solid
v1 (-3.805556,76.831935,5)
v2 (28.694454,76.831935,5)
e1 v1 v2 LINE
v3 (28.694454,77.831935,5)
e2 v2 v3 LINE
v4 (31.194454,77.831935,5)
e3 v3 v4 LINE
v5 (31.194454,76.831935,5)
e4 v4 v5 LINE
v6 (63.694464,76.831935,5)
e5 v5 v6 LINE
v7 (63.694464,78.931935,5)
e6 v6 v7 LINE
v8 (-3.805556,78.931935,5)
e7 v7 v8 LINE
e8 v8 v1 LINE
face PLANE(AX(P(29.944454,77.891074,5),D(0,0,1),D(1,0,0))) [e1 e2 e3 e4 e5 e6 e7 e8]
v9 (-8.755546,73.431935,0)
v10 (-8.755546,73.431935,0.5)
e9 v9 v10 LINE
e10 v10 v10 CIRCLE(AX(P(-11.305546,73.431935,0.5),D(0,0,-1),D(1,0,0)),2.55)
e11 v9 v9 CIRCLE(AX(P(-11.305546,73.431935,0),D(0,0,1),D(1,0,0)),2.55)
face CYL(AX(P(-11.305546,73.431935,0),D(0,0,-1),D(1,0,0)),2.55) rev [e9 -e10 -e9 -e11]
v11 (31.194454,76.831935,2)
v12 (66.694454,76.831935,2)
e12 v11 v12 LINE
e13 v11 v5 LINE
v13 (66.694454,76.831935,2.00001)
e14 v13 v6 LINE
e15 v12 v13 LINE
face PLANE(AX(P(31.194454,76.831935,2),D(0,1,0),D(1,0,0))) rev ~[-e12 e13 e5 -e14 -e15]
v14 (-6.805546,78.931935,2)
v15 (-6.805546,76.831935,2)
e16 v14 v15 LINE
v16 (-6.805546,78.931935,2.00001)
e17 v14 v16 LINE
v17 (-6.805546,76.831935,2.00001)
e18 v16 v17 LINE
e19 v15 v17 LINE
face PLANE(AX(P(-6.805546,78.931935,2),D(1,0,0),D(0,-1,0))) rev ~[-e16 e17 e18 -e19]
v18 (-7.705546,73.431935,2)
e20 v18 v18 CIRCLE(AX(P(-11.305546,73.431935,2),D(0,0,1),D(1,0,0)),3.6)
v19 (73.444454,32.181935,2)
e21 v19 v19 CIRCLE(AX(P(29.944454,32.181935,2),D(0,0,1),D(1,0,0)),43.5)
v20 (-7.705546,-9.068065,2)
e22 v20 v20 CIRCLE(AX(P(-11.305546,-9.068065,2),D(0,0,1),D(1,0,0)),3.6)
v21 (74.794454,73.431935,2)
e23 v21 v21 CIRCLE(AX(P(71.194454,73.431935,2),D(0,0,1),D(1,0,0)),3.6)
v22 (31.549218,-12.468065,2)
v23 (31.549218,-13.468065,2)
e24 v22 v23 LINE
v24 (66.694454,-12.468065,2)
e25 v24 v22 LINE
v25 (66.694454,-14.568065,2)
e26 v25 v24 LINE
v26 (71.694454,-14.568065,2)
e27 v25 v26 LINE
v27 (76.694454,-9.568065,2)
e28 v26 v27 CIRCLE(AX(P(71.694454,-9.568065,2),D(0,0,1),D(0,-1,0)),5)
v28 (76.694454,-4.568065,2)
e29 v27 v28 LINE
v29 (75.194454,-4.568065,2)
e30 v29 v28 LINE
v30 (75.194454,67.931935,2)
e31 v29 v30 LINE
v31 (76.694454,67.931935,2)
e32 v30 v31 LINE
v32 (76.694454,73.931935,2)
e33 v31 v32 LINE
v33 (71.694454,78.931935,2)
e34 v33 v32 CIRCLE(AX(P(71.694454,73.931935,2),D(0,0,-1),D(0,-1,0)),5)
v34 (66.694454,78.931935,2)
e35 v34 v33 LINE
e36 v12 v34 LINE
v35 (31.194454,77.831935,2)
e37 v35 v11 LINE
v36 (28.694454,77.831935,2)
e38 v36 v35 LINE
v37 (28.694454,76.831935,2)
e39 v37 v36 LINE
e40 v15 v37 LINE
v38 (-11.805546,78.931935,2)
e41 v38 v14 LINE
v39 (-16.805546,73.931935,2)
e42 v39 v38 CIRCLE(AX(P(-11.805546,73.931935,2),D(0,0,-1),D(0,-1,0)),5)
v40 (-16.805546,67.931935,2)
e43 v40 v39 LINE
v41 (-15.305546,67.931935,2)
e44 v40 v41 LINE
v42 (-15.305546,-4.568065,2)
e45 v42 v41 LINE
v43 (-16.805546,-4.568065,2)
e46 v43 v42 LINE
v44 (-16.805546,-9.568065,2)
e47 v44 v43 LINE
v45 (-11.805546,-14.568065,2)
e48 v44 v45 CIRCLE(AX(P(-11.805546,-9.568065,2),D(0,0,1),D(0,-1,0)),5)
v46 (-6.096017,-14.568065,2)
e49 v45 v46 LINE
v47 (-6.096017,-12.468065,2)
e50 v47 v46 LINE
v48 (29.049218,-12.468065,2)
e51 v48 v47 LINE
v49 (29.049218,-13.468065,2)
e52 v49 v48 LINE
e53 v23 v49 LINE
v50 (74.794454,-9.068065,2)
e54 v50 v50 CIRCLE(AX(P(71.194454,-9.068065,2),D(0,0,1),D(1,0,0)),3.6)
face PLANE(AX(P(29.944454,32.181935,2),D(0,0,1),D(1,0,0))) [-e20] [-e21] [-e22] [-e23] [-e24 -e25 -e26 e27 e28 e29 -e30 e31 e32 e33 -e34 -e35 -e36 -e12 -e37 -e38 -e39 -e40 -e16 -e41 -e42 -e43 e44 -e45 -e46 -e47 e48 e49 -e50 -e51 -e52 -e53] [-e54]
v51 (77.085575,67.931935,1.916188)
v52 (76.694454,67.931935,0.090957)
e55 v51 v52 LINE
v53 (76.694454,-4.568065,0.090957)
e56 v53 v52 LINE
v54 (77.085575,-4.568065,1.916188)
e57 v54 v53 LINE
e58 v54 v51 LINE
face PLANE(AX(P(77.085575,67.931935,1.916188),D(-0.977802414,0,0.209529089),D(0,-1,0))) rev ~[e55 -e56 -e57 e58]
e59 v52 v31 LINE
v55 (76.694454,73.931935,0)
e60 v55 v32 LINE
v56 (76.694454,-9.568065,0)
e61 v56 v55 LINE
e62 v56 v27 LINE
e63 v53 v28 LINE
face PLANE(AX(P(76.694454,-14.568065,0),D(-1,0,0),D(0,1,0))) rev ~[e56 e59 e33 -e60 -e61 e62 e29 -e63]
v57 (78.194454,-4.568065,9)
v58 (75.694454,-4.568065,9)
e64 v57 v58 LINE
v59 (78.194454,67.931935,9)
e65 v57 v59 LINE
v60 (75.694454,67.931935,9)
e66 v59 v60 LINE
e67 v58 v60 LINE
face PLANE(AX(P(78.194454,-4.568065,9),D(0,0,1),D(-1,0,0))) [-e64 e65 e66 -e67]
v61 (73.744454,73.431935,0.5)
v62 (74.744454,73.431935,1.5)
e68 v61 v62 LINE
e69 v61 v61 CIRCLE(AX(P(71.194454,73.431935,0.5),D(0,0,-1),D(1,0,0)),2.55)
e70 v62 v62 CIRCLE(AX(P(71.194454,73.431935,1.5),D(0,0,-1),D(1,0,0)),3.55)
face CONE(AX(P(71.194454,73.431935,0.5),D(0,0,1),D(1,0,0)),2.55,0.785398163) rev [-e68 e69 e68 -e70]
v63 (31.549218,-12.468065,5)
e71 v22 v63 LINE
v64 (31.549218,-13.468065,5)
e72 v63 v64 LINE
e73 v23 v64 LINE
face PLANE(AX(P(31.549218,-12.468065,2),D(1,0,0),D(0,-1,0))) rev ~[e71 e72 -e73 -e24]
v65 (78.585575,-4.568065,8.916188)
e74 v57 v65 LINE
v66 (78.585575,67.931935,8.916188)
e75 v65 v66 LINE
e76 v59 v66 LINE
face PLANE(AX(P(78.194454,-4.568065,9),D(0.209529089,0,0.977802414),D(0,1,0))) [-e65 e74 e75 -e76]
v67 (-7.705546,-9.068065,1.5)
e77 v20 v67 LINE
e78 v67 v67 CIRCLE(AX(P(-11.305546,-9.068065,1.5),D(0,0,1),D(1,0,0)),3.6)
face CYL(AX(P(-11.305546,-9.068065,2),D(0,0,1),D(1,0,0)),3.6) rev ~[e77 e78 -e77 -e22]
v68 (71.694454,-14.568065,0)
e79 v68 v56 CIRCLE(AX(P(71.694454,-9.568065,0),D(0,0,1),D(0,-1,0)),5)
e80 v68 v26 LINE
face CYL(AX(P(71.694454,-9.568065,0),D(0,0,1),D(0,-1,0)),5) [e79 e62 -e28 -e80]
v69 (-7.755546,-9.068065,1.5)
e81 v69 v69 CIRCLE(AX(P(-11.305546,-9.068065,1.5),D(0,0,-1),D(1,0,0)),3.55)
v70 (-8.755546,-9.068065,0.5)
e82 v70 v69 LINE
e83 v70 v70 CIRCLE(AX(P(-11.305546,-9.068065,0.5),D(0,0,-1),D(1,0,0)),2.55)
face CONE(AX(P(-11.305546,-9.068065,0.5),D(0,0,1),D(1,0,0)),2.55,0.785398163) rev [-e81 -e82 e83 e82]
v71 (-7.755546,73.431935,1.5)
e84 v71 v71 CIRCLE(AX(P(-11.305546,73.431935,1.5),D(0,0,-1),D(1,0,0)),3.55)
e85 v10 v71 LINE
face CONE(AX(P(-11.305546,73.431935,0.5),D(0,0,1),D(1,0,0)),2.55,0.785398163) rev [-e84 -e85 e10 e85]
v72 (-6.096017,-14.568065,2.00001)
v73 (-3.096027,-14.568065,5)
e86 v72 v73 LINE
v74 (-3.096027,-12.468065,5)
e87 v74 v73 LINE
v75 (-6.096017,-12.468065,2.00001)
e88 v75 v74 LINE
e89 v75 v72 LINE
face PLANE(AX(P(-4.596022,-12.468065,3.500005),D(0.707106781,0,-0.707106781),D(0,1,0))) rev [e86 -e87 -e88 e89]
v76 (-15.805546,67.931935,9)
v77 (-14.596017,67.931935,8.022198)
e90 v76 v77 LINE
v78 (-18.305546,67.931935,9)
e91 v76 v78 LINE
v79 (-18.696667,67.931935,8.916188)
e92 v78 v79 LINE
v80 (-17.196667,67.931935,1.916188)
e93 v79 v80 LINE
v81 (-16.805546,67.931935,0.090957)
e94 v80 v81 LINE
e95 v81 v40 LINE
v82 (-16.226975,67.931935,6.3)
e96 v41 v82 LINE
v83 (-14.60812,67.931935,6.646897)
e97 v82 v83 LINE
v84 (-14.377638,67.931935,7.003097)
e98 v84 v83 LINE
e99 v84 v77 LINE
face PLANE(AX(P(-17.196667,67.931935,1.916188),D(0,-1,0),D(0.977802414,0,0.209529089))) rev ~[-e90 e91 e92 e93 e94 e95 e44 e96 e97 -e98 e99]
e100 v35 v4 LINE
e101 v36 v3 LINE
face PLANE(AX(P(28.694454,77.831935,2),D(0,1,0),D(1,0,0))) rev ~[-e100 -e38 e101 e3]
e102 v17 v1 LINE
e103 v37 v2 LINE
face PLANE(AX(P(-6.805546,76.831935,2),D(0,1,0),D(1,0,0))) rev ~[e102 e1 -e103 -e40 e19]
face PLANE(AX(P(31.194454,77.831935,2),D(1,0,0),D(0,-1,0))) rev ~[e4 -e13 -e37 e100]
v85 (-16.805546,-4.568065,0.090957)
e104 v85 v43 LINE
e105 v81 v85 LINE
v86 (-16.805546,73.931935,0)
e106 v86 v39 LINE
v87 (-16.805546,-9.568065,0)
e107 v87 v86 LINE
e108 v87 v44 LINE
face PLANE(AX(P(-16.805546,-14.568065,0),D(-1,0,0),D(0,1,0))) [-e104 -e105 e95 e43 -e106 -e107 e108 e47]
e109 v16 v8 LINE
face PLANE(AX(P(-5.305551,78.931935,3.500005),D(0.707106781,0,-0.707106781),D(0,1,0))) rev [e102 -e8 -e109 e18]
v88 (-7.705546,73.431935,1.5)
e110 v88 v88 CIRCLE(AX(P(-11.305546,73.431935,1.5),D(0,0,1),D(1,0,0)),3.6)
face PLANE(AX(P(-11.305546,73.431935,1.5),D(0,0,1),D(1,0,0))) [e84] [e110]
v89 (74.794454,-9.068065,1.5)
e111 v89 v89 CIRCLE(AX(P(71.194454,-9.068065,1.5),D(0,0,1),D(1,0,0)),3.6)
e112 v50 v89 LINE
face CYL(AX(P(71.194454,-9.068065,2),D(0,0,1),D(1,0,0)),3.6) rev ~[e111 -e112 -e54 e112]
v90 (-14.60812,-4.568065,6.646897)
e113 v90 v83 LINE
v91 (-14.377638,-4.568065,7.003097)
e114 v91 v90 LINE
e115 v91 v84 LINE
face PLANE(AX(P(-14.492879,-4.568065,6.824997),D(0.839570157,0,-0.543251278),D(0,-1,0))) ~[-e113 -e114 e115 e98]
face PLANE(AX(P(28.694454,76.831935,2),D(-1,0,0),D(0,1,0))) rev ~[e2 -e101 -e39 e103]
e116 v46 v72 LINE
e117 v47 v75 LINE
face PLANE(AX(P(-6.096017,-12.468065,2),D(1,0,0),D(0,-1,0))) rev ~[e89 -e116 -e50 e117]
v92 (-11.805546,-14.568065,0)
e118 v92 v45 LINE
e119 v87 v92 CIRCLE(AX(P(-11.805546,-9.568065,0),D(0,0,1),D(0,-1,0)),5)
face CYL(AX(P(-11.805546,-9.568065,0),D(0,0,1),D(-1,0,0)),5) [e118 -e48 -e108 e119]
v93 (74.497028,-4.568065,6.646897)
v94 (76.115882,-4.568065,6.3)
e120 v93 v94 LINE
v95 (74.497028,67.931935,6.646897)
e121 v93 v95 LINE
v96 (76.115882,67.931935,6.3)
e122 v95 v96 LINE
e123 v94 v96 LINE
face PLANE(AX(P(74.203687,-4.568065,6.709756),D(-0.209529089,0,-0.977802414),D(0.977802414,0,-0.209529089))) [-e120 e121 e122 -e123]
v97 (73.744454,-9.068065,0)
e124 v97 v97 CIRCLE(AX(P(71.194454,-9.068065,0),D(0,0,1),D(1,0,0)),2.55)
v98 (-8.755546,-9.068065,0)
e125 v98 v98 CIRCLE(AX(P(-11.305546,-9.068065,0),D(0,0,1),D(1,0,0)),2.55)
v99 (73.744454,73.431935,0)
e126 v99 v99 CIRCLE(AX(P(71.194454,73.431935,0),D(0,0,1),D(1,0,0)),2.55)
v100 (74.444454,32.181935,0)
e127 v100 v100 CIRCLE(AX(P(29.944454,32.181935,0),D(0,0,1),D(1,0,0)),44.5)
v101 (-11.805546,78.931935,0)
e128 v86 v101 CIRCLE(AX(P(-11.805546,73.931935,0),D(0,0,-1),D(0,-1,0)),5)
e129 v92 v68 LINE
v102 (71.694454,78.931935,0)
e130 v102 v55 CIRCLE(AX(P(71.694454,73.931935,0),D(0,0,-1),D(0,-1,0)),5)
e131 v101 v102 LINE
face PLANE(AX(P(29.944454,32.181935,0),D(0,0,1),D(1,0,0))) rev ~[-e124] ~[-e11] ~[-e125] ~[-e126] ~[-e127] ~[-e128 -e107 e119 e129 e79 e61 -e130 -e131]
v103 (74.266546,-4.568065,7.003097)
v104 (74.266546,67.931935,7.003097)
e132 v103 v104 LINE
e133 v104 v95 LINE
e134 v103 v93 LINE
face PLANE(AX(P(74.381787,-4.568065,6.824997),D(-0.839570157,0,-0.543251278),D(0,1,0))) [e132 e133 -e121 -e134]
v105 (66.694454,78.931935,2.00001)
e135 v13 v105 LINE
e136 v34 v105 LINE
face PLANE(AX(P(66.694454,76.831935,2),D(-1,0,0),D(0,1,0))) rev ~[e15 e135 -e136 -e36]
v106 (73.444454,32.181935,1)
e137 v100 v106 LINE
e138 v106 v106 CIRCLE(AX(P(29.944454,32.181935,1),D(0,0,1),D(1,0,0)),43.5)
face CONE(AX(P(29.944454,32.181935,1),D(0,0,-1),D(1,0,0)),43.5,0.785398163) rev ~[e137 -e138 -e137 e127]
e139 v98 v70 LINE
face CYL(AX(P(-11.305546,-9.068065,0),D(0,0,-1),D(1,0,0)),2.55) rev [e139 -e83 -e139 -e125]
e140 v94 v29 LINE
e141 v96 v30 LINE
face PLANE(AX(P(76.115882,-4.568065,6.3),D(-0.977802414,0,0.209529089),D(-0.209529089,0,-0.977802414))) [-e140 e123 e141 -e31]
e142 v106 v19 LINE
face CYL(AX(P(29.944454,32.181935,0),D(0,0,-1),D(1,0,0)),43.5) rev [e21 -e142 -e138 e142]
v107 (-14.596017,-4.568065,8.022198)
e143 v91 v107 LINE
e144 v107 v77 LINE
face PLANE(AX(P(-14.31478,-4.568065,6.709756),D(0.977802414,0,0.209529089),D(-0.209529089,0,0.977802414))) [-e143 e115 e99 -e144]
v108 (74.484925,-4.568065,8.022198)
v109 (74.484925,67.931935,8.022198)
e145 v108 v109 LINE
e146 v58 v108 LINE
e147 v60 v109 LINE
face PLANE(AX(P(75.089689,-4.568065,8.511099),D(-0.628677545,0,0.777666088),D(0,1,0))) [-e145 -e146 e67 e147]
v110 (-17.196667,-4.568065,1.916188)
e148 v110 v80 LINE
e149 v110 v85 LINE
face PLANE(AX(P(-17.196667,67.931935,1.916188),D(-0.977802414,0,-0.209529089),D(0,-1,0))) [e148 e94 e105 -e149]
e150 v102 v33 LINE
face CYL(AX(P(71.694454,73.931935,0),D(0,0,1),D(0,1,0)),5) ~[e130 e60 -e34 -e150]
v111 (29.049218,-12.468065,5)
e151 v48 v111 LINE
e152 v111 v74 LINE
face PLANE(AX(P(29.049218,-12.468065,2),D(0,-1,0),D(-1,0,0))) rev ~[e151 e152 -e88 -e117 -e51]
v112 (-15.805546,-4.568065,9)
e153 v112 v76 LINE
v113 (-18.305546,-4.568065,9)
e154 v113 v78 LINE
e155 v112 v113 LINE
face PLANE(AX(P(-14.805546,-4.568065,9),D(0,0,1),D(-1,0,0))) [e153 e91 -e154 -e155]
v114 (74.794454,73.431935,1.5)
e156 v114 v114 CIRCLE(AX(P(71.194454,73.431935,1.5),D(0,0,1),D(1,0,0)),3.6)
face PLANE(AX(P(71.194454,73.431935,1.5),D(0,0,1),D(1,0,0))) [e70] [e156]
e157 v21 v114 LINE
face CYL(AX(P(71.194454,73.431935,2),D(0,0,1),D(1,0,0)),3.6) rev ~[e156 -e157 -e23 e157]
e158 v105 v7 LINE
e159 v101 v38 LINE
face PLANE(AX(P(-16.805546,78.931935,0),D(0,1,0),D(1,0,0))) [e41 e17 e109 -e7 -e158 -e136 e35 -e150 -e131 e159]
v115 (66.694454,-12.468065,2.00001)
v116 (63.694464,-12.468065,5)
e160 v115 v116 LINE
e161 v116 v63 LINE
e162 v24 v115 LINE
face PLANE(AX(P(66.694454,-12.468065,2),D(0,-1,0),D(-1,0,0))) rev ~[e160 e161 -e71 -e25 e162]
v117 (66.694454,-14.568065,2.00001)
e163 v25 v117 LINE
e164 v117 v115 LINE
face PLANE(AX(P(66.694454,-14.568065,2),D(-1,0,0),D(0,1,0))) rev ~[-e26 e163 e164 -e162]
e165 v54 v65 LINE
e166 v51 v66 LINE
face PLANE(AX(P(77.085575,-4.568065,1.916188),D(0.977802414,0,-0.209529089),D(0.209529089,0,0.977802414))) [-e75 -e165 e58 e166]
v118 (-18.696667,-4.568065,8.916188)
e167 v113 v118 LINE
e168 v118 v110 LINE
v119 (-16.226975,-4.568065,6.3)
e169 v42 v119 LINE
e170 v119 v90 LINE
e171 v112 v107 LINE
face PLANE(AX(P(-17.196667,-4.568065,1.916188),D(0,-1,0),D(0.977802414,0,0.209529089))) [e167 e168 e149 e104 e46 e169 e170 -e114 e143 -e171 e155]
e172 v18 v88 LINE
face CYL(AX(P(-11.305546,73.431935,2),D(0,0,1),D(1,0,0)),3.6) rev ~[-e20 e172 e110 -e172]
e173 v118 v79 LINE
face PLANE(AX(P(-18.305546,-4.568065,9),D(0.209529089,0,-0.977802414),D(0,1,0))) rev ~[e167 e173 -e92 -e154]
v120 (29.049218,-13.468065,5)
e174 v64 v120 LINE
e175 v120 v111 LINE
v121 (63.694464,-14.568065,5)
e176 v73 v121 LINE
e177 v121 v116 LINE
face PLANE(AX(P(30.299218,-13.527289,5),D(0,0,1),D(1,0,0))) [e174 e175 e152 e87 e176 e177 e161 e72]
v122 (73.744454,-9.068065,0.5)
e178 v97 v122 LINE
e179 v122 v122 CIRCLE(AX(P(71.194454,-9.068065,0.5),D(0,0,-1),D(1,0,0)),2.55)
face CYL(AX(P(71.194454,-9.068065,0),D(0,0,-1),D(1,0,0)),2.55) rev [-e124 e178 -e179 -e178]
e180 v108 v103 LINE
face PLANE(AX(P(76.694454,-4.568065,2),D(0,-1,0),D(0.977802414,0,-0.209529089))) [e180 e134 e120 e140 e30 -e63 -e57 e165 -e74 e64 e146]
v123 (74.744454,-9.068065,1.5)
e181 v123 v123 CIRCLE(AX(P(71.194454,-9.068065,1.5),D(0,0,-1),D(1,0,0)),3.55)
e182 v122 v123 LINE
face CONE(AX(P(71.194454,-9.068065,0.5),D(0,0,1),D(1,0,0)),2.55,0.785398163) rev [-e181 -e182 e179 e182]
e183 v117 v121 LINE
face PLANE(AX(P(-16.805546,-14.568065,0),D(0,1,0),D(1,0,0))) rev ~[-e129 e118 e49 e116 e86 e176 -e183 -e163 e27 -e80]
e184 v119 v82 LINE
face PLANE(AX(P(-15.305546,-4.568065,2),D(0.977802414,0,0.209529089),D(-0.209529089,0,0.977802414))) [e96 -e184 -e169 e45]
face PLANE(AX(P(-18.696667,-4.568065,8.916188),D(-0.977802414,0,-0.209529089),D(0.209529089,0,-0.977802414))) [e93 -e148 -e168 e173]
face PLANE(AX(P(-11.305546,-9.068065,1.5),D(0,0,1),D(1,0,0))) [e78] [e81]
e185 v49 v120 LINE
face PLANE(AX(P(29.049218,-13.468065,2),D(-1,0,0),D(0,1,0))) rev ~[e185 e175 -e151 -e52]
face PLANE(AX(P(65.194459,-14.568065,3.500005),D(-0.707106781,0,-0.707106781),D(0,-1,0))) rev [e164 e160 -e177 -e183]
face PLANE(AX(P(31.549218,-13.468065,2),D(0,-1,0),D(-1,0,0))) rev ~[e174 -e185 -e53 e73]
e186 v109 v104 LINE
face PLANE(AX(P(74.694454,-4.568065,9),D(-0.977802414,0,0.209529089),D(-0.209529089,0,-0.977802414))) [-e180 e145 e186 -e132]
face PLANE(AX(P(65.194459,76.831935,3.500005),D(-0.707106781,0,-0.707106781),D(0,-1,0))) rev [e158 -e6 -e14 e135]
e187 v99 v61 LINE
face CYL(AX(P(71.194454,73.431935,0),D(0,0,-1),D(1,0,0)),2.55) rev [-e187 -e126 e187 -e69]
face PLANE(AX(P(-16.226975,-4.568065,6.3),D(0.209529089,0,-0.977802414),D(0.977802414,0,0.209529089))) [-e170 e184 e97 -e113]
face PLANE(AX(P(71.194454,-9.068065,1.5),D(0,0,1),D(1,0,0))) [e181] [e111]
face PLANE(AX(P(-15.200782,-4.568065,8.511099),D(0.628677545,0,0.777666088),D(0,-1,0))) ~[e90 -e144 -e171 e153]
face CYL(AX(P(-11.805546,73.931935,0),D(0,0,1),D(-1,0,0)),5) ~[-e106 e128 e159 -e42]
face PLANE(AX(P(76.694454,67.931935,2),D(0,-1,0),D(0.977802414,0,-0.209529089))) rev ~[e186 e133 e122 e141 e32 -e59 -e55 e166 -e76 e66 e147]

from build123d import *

# Parameters (mm, degrees)
F0_W       = 93.5
F0_H       = 93.5
F0_R       = 2.55
F0_R_2     = 43.5
F1_DEPTH   = 2
F3_START   = -10
F3_DEPTH   = 72.5
F4_SIZE    = 1
F6_DEPTH   = 3
F7_SIZE    = 2.99999
F8_R       = 3.6
F9_DEPTH   = 0.5
F10_SIZE   = 1
F11_R      = 5
F12_SIZE   = 1
F13_SIZE   = 0.3
F14_DEPTH  = 0.4
F15_DEPTH  = 0.4
F15_FACE_W = 0.4
F15_FACE_H = 72.5
F14_FACE_W = 0.4
F14_FACE_H = 72.5


# Not quite as in the source:
# - a fillet or chamfer is up to 0.001 mm smaller than in the source, because OpenCascade refuses the exact size


with BuildPart() as f1:
    # F0 (on Top) → F1 (new body)
    with BuildSketch(Plane.XY):
        with Locations((29.9444539048, 32.1819351325)):
            Rectangle(F0_W, F0_H)
        with Locations((-11.3055460952, -9.0680648675)):
            Circle(F0_R, mode=Mode.SUBTRACT)
        with Locations((71.1944539048, -9.0680648675)):
            Circle(F0_R, mode=Mode.SUBTRACT)
        with Locations((29.9444539048, 32.1819351325)):
            Circle(F0_R_2, mode=Mode.SUBTRACT)
        with Locations((-11.3055460952, 73.4319351325)):
            Circle(F0_R, mode=Mode.SUBTRACT)
        with Locations((71.1944539048, 73.4319351325)):
            Circle(F0_R, mode=Mode.SUBTRACT)
    extrude(amount=F1_DEPTH)

    # F2 (on face) → F3 (join)
    with BuildSketch(Plane.XZ.offset(14.5680648675).offset(F3_START)):
        Polygon((-16.8055460952, 9), (-16.2269746666, 6.3), (-14.3147795447, 6.7097560976), (-14.8055460952, 9), align=None)
        Polygon((-16.8055460952, 2), (-15.3055460952, 2), (-16.2269746666, 6.3), (-16.8055460952, 9), (-18.3055460952, 9), align=None)
        Polygon((76.1158824762, 6.3), (75.1944539048, 2), (76.6944539048, 2), (78.1944539048, 9), (76.6944539048, 9), align=None)
        Polygon((74.2036873543, 6.7097560976), (76.1158824762, 6.3), (76.6944539048, 9), (74.6944539048, 9), align=None)
    extrude(amount=-F3_DEPTH)

    # F4
    f4_edges = [f1.edges().sort_by_distance(p)[0] for p in [
        (-14.805546, 31.681935, 9),
        (74.694454, 31.681935, 9),
    ]]
    chamfer(f4_edges, length=F4_SIZE)

    # F5 (on face) → F6 (join)
    with BuildSketch(Plane.XY.offset(2)):
        Polygon((-6.0960170065, -14.5680648675), (66.6944539048, -14.5680648675), (66.6944539048, -12.4680648675), (31.5492184492, -12.4680648675), (31.5492184492, -13.4680648675), (29.0492184492, -13.4680648675), (29.0492184492, -12.4680648675), (-6.0960170065, -12.4680648675), align=None)
        Polygon((66.6944539048, 76.8319351325), (66.6944539048, 78.9319351325), (-6.8055460952, 78.9319351325), (-6.8055460952, 76.8319351325), (28.6944539048, 76.8319351325), (28.6944539048, 77.8319351325), (31.1944539048, 77.8319351325), (31.1944539048, 76.8319351325), align=None)
    extrude(amount=F6_DEPTH)

    # F7 (size 3 in the source; OpenCascade refuses exactly that, so slightly less here)
    f7_edges = [f1.edges().sort_by_distance(p)[0] for p in [
        (66.694454, -13.518065, 5),
        (-6.096017, -13.518065, 5),
        (-6.805546, 77.881935, 5),
        (66.694454, 77.881935, 5),
    ]]
    chamfer(f7_edges, length=F7_SIZE)

    # F8 (on face) → F9 (cut)
    with BuildSketch(Plane.XY.offset(2)):
        with Locations((-11.3055460952, -9.0680648675)):
            Circle(F8_R)
        with Locations((71.1944539048, -9.0680648675)):
            Circle(F8_R)
        with Locations((71.1944539048, 73.4319351325)):
            Circle(F8_R)
        with Locations((-11.3055460952, 73.4319351325)):
            Circle(F8_R)
    extrude(amount=-F9_DEPTH, mode=Mode.SUBTRACT)

    # F10
    f10_edges = [f1.edges().sort_by_distance(p)[0] for p in [
        (-13.855546, -9.068065, 1.5),
        (68.644454, -9.068065, 1.5),
        (68.644454, 73.431935, 1.5),
        (-13.855546, 73.431935, 1.5),
    ]]
    chamfer(f10_edges, length=F10_SIZE)

    # F11
    f11_edges = [f1.edges().sort_by_distance(p)[0] for p in [
        (-16.805546, 78.931935, 1),
        (-16.805546, -14.568065, 1),
        (76.694454, -14.568065, 1),
        (76.694454, 78.931935, 1),
    ]]
    fillet(f11_edges, radius=F11_R)

    # F12
    f12_edges = [f1.edges().sort_by_distance(p)[0] for p in [
        (-13.555546, 32.181935, 0),
    ]]
    chamfer(f12_edges, length=F12_SIZE)

    # F13
    f13_edges = [f1.edges().sort_by_distance(p)[0] for p in [
        (-14.31478, 31.681935, 6.709756),
        (74.203687, 31.681935, 6.709756),
    ]]
    chamfer(f13_edges, length=F13_SIZE)

    # F14 (add): a face of the model
    f14_faces = [f1.faces().sort_by_distance(p)[0] for p in [
        (-17.5555460952, 31.6819351325, 5.5),
    ]]
    extrude(f14_faces, amount=F14_DEPTH)

    # F15 (add): a face of the model
    f15_faces = [f1.faces().sort_by_distance(p)[0] for p in [
        (77.4444539048, 31.6819351325, 5.5),
    ]]
    extrude(f15_faces, amount=F15_DEPTH)

    # F15_face (on face) → F16 (join, up to the next surface of F1)
    with BuildSketch(Plane(origin=(76.8900143876, 31.6819351325, 1.9580941823), x_dir=(1, 0, 0), z_dir=(-0.2095290887, 0, -0.9778024141))):
        Rectangle(F15_FACE_W, F15_FACE_H)
    extrude(until=Until.NEXT)

    # F14_face (on face) → F17 (join, up to the next surface of F1)
    with BuildSketch(Plane(origin=(-17.001106578, 31.6819351325, 1.9580941823), x_dir=(1, 0, 0), z_dir=(0.2095290887, 0, -0.9778024141))):
        Rectangle(F14_FACE_W, F14_FACE_H)
    extrude(until=Until.NEXT)


solid = f1.part
